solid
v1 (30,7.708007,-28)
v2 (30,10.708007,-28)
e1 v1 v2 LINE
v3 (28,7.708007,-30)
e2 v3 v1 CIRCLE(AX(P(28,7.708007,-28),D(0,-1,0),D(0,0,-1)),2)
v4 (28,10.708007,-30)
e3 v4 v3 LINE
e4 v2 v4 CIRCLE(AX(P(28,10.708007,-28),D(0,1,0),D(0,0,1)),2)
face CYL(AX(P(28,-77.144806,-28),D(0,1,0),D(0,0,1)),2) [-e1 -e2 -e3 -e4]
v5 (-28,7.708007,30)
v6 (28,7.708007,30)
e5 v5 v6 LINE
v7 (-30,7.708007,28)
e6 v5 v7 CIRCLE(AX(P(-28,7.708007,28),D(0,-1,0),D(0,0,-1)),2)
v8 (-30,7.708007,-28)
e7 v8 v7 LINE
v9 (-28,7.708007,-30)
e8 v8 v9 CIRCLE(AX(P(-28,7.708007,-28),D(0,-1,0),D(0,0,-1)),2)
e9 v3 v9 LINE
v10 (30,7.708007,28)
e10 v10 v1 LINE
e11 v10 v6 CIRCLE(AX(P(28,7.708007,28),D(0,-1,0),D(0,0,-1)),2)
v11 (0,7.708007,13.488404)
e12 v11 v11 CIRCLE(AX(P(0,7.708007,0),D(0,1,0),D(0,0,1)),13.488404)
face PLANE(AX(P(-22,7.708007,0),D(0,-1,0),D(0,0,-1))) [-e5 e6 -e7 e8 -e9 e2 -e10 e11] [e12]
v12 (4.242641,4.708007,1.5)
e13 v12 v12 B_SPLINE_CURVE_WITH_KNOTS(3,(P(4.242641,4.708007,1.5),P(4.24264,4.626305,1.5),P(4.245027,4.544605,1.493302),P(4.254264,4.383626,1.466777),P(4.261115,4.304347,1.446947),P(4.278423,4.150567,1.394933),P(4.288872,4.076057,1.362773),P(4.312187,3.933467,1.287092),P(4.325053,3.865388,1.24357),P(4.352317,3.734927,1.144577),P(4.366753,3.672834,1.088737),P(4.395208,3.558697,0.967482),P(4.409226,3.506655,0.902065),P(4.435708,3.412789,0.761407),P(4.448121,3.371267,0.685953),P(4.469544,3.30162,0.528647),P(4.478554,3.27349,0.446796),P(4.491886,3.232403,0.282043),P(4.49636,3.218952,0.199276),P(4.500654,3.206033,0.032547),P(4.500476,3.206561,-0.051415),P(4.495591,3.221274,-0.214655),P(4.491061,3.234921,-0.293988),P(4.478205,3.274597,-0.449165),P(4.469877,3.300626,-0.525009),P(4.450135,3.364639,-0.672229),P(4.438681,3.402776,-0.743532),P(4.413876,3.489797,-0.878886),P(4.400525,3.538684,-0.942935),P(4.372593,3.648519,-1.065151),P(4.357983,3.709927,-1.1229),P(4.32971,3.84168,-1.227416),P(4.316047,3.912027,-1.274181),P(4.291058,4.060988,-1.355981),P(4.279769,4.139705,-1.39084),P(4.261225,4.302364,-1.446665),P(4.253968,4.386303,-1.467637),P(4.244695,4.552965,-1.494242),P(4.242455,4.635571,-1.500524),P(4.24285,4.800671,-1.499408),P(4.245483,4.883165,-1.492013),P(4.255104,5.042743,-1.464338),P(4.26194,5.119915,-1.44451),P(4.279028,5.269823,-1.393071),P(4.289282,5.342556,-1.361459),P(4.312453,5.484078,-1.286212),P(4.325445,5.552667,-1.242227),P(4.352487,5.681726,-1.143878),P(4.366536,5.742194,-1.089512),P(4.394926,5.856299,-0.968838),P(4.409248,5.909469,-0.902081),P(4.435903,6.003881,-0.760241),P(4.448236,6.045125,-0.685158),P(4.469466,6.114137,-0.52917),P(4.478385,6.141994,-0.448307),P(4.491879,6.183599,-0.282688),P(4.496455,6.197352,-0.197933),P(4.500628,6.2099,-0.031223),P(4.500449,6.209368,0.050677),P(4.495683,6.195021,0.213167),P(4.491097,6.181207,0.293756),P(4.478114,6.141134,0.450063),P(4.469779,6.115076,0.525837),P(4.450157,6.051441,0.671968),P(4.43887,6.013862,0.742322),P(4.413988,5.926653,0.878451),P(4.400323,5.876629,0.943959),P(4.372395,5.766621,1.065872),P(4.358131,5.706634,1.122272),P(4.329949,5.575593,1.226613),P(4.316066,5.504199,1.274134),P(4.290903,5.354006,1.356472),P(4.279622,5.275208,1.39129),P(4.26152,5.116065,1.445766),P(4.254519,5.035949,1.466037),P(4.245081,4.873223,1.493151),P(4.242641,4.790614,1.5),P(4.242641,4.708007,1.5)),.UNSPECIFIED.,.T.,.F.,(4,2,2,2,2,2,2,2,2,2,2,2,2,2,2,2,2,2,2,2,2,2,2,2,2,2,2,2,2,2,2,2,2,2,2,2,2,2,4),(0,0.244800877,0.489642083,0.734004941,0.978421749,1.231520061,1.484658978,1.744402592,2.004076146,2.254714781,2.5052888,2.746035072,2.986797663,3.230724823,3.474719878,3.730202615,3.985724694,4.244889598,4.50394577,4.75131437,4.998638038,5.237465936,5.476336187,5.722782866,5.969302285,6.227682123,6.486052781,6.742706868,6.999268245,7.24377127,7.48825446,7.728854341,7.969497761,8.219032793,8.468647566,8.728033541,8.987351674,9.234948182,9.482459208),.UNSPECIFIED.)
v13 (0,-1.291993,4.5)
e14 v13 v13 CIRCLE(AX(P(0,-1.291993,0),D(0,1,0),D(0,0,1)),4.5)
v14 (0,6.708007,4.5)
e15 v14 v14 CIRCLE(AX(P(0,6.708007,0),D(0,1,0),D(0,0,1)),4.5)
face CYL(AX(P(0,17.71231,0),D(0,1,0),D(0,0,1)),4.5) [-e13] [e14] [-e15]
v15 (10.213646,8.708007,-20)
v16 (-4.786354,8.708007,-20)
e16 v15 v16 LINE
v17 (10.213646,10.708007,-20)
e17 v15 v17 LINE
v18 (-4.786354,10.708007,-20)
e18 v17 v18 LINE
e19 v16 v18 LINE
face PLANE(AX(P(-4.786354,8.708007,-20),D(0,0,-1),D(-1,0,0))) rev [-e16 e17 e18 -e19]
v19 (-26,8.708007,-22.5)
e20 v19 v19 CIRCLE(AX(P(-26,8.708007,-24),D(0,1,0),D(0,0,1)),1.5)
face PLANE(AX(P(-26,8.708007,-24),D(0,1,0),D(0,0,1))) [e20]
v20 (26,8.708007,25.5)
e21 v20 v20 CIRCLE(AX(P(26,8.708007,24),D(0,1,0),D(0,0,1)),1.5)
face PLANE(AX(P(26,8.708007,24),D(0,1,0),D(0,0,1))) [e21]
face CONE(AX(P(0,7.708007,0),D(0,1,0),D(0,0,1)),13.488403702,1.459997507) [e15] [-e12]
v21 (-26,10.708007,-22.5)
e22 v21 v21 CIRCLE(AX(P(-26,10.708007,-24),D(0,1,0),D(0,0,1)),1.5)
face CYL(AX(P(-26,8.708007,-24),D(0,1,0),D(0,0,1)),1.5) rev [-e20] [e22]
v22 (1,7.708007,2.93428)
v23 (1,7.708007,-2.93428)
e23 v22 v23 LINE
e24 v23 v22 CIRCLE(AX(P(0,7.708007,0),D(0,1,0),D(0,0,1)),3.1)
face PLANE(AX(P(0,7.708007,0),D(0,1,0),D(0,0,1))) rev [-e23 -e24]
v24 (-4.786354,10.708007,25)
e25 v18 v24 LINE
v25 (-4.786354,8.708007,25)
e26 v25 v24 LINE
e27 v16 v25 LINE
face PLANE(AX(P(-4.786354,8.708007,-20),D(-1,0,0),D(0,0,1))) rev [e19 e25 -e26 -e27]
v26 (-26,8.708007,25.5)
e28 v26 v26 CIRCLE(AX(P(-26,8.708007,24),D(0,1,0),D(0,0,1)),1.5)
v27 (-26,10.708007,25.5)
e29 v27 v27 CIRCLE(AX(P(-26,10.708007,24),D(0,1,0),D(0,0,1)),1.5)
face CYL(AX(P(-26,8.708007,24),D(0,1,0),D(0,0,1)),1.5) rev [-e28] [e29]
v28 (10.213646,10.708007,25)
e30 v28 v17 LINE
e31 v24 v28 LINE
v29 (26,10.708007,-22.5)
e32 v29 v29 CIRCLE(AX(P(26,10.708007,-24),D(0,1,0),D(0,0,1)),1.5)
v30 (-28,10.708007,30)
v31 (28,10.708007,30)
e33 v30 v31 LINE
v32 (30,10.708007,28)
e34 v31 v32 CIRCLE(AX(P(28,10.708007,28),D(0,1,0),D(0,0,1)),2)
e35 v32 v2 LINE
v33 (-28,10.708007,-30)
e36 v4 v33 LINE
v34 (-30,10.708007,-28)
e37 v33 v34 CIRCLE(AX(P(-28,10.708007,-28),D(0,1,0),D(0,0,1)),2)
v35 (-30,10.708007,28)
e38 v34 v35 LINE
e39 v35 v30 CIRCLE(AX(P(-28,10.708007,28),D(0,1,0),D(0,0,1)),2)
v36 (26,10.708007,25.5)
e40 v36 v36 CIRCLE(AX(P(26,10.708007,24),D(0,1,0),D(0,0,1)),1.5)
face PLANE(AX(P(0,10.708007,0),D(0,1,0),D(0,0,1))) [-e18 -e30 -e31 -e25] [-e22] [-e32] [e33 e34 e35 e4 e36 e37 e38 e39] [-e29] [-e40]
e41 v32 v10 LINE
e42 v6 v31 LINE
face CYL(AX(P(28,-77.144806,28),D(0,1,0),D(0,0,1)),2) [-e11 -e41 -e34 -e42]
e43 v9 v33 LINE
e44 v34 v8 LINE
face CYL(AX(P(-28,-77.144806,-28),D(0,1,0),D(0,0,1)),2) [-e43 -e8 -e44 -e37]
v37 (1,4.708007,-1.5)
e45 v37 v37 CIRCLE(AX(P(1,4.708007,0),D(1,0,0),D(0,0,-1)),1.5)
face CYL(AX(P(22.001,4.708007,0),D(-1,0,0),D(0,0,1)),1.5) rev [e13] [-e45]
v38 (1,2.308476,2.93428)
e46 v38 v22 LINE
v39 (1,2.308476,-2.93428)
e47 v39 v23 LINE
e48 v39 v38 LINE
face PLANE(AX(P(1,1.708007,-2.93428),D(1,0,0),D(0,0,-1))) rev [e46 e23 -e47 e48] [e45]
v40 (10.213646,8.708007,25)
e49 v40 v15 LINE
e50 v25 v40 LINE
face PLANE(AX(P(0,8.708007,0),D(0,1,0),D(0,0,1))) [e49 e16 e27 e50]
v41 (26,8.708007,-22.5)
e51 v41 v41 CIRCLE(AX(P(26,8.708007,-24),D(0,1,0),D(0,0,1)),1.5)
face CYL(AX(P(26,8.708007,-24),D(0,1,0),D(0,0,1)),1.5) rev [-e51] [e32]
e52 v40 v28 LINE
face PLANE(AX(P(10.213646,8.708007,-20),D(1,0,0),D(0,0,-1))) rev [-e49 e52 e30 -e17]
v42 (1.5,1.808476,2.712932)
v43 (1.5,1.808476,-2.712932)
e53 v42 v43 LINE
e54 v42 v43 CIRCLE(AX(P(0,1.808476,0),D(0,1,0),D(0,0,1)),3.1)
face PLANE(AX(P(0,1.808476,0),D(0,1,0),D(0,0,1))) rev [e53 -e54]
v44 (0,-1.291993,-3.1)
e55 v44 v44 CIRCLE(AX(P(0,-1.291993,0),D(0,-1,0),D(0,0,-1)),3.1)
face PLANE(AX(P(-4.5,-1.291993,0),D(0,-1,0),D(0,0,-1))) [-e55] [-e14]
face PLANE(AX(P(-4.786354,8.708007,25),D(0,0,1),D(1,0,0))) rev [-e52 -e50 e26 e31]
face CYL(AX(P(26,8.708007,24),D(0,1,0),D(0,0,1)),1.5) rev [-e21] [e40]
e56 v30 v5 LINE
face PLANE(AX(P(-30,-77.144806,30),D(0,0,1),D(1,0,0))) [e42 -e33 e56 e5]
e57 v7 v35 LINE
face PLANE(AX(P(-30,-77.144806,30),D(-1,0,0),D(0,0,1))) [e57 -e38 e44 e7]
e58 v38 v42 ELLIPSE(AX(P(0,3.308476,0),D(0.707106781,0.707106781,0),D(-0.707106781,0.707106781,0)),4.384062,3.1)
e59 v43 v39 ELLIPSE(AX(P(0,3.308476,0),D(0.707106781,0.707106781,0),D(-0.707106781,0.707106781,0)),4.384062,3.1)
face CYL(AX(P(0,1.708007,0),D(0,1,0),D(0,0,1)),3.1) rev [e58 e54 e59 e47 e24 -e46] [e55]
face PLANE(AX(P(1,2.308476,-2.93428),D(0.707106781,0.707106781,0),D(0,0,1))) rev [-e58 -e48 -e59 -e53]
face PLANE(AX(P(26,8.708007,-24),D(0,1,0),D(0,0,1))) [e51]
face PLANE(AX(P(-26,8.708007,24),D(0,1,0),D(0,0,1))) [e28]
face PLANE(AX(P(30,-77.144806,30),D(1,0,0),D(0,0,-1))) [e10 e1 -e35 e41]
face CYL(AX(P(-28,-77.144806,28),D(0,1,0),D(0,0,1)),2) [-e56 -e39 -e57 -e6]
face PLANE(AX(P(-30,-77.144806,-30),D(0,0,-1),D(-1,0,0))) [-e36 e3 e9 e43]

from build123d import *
from build123d.topology import SkipClean

# Parameters (mm, degrees)
CORTAR_EXTRUIR7_REACH      = 34.904
CORTAR_EXTRUIR7_END_RADIUS = 4.5
CROQUIS17_R                = 1.5
CORTAR_EXTRUIR10_START     = -3
CORTAR_EXTRUIR10_DEPTH     = 6
CROQUIS21_W                = 3.1
CROQUIS21_H                = 3.480038904
CHAFL_N2_SIZE              = 0.5
CROQUIS22_W                = 60
CROQUIS22_H                = 60
SALIENTE_EXTRUIR1_DEPTH    = 3
REDONDEO1_R                = 2
CROQUIS23_R                = 1.5
CROQUIS23_W                = 15
CROQUIS23_H                = 45
CORTAR_EXTRUIR11_DEPTH     = 2


with BuildPart() as part:
    # Croquis9 → Revolución3 (revolve)
    with BuildSketch(Plane.XY, mode=Mode.PRIVATE) as revoluci_n3_sk:
        Polygon((0, 10.708007251), (-22, 10.708007251), (-22, 7.708007251), (-13.488403702, 7.708007251), (-4.5, 6.708007251), (-4.5, -1.291992749), (0, -1.291992749), align=None)
    revolve(revoluci_n3_sk.sketch.rotate(Axis((0, 17.712309747, 0), (0, -1, 0)), 270), axis=Axis((0, 17.712309747, 0), (0, -1, 0)))

    # Cortar-Extruir7: up to this cylinder (the profile starts inside it)
    cortar_extruir7_end = Plane(origin=(0, 4.708007, 0), z_dir=(0, 1, 0)) * Cylinder(CORTAR_EXTRUIR7_END_RADIUS, 79.808, mode=Mode.PRIVATE)
    # Croquis17 → Cortar-Extruir7 (cut, up to the surface)
    with BuildSketch(Plane(origin=(0, 0, 0), x_dir=(0, 0, -1), z_dir=(1, 0, 0)), mode=Mode.PRIVATE) as cortar_extruir7_sk1:
        with Locations(Location((0, 4.708007251, 0), (0, 0, 180))):
            Circle(CROQUIS17_R)
    cortar_extruir7_tool1 = extrude(cortar_extruir7_sk1.sketch, amount=CORTAR_EXTRUIR7_REACH, mode=Mode.PRIVATE) & cortar_extruir7_end
    add(cortar_extruir7_tool1.solids().sort_by_distance((0, 4.708007, 0))[0], mode=Mode.SUBTRACT)

    # Croquis18 → Cortar-Extruir10 (cut)
    with BuildSketch(Plane(origin=(0, 10.708007251, 0), x_dir=(1, 0, 0), z_dir=(0, 1, 0)).offset(CORTAR_EXTRUIR10_START)):
        with BuildLine():
            Line((1, 2.93428015), (1, -2.93428015))
            ThreePointArc((1, -2.93428015), (-3.1, 0), (1, 2.93428015))
        make_face()
    extrude(amount=-CORTAR_EXTRUIR10_DEPTH, mode=Mode.SUBTRACT)

    # Croquis21 → Cortar-Revolución1 (revolve, cut)
    with SkipClean():  # the faces are left unmerged after this step: merging them gives an invalid solid
        with BuildSketch(Plane.XY, mode=Mode.PRIVATE) as cortar_revoluci_n1_sk:
            with Locations((-1.55, 0.068456853)):
                Rectangle(CROQUIS21_W, CROQUIS21_H)
        revolve(cortar_revoluci_n1_sk.sketch.rotate(Axis((0, 3.581140077, 0), (0, -1, 0)), 251.180936631), axis=Axis((0, 3.581140077, 0), (0, -1, 0)), mode=Mode.SUBTRACT)

    # Chaflán2
    # the kernel refuses this chamfer: 0.5 mm, written as the material it takes off along each edge
    with BuildSketch(Plane(origin=(1, 1.808476305, 4.220121644), x_dir=(-0.02749587661058627, 0.9996219169112968, 0), z_dir=(0, 0, -1))) as chafl_n2_piece_1_section:
        Polygon((CHAFL_N2_SIZE * 0.999621916911, CHAFL_N2_SIZE * 0.0274958766106), (-CHAFL_N2_SIZE * 0.0274958766106, CHAFL_N2_SIZE * 0.999621916911), (0, 0), align=None)
    chafl_n2_piece_1 = extrude(amount=8.440243288, mode=Mode.PRIVATE)
    chafl_n2_piece_1 = chafl_n2_piece_1 & Plane(origin=(0, 1.974615601, 0), x_dir=(0.32258064516148965, 0, 0.946541983943236), z_dir=(0, -1, 0)) * Cylinder(3.1, 19, mode=Mode.PRIVATE)
    add(chafl_n2_piece_1, mode=Mode.SUBTRACT)

    # Croquis22 → Saliente-Extruir1 (add)
    with BuildSketch(Plane(origin=(0, 10.708007251, 0), x_dir=(1, 0, 0), z_dir=(0, 1, 0))):
        Rectangle(CROQUIS22_W, CROQUIS22_H)
    extrude(amount=-SALIENTE_EXTRUIR1_DEPTH)

    # Redondeo1
    redondeo1_edges = [part.edges().sort_by_distance(p)[0] for p in [
        (-30, 9.208007251, -30),
        (-30, 9.208007251, 30),
        (30, 9.208007251, 30),
        (30, 9.208007251, -30),
    ]]
    fillet(redondeo1_edges, radius=REDONDEO1_R)

    # Croquis23 → Cortar-Extruir11 (cut)
    with BuildSketch(Plane(origin=(0, 10.708007251, 0), x_dir=(1, 0, 0), z_dir=(0, 1, 0))):
        with Locations(Location((-26, 24, 0), (0, 0, 270))):
            Circle(CROQUIS23_R)
        with Locations(Location((-26, -24, 0), (0, 0, 270))):
            Circle(CROQUIS23_R)
        with Locations(Location((26, -24, 0), (0, 0, 270))):
            Circle(CROQUIS23_R)
        with Locations(Location((26, 24, 0), (0, 0, 270))):
            Circle(CROQUIS23_R)
        with Locations((2.713645645, -2.5)):
            Rectangle(CROQUIS23_W, CROQUIS23_H)
    extrude(amount=-CORTAR_EXTRUIR11_DEPTH, mode=Mode.SUBTRACT)


solid = part.part
